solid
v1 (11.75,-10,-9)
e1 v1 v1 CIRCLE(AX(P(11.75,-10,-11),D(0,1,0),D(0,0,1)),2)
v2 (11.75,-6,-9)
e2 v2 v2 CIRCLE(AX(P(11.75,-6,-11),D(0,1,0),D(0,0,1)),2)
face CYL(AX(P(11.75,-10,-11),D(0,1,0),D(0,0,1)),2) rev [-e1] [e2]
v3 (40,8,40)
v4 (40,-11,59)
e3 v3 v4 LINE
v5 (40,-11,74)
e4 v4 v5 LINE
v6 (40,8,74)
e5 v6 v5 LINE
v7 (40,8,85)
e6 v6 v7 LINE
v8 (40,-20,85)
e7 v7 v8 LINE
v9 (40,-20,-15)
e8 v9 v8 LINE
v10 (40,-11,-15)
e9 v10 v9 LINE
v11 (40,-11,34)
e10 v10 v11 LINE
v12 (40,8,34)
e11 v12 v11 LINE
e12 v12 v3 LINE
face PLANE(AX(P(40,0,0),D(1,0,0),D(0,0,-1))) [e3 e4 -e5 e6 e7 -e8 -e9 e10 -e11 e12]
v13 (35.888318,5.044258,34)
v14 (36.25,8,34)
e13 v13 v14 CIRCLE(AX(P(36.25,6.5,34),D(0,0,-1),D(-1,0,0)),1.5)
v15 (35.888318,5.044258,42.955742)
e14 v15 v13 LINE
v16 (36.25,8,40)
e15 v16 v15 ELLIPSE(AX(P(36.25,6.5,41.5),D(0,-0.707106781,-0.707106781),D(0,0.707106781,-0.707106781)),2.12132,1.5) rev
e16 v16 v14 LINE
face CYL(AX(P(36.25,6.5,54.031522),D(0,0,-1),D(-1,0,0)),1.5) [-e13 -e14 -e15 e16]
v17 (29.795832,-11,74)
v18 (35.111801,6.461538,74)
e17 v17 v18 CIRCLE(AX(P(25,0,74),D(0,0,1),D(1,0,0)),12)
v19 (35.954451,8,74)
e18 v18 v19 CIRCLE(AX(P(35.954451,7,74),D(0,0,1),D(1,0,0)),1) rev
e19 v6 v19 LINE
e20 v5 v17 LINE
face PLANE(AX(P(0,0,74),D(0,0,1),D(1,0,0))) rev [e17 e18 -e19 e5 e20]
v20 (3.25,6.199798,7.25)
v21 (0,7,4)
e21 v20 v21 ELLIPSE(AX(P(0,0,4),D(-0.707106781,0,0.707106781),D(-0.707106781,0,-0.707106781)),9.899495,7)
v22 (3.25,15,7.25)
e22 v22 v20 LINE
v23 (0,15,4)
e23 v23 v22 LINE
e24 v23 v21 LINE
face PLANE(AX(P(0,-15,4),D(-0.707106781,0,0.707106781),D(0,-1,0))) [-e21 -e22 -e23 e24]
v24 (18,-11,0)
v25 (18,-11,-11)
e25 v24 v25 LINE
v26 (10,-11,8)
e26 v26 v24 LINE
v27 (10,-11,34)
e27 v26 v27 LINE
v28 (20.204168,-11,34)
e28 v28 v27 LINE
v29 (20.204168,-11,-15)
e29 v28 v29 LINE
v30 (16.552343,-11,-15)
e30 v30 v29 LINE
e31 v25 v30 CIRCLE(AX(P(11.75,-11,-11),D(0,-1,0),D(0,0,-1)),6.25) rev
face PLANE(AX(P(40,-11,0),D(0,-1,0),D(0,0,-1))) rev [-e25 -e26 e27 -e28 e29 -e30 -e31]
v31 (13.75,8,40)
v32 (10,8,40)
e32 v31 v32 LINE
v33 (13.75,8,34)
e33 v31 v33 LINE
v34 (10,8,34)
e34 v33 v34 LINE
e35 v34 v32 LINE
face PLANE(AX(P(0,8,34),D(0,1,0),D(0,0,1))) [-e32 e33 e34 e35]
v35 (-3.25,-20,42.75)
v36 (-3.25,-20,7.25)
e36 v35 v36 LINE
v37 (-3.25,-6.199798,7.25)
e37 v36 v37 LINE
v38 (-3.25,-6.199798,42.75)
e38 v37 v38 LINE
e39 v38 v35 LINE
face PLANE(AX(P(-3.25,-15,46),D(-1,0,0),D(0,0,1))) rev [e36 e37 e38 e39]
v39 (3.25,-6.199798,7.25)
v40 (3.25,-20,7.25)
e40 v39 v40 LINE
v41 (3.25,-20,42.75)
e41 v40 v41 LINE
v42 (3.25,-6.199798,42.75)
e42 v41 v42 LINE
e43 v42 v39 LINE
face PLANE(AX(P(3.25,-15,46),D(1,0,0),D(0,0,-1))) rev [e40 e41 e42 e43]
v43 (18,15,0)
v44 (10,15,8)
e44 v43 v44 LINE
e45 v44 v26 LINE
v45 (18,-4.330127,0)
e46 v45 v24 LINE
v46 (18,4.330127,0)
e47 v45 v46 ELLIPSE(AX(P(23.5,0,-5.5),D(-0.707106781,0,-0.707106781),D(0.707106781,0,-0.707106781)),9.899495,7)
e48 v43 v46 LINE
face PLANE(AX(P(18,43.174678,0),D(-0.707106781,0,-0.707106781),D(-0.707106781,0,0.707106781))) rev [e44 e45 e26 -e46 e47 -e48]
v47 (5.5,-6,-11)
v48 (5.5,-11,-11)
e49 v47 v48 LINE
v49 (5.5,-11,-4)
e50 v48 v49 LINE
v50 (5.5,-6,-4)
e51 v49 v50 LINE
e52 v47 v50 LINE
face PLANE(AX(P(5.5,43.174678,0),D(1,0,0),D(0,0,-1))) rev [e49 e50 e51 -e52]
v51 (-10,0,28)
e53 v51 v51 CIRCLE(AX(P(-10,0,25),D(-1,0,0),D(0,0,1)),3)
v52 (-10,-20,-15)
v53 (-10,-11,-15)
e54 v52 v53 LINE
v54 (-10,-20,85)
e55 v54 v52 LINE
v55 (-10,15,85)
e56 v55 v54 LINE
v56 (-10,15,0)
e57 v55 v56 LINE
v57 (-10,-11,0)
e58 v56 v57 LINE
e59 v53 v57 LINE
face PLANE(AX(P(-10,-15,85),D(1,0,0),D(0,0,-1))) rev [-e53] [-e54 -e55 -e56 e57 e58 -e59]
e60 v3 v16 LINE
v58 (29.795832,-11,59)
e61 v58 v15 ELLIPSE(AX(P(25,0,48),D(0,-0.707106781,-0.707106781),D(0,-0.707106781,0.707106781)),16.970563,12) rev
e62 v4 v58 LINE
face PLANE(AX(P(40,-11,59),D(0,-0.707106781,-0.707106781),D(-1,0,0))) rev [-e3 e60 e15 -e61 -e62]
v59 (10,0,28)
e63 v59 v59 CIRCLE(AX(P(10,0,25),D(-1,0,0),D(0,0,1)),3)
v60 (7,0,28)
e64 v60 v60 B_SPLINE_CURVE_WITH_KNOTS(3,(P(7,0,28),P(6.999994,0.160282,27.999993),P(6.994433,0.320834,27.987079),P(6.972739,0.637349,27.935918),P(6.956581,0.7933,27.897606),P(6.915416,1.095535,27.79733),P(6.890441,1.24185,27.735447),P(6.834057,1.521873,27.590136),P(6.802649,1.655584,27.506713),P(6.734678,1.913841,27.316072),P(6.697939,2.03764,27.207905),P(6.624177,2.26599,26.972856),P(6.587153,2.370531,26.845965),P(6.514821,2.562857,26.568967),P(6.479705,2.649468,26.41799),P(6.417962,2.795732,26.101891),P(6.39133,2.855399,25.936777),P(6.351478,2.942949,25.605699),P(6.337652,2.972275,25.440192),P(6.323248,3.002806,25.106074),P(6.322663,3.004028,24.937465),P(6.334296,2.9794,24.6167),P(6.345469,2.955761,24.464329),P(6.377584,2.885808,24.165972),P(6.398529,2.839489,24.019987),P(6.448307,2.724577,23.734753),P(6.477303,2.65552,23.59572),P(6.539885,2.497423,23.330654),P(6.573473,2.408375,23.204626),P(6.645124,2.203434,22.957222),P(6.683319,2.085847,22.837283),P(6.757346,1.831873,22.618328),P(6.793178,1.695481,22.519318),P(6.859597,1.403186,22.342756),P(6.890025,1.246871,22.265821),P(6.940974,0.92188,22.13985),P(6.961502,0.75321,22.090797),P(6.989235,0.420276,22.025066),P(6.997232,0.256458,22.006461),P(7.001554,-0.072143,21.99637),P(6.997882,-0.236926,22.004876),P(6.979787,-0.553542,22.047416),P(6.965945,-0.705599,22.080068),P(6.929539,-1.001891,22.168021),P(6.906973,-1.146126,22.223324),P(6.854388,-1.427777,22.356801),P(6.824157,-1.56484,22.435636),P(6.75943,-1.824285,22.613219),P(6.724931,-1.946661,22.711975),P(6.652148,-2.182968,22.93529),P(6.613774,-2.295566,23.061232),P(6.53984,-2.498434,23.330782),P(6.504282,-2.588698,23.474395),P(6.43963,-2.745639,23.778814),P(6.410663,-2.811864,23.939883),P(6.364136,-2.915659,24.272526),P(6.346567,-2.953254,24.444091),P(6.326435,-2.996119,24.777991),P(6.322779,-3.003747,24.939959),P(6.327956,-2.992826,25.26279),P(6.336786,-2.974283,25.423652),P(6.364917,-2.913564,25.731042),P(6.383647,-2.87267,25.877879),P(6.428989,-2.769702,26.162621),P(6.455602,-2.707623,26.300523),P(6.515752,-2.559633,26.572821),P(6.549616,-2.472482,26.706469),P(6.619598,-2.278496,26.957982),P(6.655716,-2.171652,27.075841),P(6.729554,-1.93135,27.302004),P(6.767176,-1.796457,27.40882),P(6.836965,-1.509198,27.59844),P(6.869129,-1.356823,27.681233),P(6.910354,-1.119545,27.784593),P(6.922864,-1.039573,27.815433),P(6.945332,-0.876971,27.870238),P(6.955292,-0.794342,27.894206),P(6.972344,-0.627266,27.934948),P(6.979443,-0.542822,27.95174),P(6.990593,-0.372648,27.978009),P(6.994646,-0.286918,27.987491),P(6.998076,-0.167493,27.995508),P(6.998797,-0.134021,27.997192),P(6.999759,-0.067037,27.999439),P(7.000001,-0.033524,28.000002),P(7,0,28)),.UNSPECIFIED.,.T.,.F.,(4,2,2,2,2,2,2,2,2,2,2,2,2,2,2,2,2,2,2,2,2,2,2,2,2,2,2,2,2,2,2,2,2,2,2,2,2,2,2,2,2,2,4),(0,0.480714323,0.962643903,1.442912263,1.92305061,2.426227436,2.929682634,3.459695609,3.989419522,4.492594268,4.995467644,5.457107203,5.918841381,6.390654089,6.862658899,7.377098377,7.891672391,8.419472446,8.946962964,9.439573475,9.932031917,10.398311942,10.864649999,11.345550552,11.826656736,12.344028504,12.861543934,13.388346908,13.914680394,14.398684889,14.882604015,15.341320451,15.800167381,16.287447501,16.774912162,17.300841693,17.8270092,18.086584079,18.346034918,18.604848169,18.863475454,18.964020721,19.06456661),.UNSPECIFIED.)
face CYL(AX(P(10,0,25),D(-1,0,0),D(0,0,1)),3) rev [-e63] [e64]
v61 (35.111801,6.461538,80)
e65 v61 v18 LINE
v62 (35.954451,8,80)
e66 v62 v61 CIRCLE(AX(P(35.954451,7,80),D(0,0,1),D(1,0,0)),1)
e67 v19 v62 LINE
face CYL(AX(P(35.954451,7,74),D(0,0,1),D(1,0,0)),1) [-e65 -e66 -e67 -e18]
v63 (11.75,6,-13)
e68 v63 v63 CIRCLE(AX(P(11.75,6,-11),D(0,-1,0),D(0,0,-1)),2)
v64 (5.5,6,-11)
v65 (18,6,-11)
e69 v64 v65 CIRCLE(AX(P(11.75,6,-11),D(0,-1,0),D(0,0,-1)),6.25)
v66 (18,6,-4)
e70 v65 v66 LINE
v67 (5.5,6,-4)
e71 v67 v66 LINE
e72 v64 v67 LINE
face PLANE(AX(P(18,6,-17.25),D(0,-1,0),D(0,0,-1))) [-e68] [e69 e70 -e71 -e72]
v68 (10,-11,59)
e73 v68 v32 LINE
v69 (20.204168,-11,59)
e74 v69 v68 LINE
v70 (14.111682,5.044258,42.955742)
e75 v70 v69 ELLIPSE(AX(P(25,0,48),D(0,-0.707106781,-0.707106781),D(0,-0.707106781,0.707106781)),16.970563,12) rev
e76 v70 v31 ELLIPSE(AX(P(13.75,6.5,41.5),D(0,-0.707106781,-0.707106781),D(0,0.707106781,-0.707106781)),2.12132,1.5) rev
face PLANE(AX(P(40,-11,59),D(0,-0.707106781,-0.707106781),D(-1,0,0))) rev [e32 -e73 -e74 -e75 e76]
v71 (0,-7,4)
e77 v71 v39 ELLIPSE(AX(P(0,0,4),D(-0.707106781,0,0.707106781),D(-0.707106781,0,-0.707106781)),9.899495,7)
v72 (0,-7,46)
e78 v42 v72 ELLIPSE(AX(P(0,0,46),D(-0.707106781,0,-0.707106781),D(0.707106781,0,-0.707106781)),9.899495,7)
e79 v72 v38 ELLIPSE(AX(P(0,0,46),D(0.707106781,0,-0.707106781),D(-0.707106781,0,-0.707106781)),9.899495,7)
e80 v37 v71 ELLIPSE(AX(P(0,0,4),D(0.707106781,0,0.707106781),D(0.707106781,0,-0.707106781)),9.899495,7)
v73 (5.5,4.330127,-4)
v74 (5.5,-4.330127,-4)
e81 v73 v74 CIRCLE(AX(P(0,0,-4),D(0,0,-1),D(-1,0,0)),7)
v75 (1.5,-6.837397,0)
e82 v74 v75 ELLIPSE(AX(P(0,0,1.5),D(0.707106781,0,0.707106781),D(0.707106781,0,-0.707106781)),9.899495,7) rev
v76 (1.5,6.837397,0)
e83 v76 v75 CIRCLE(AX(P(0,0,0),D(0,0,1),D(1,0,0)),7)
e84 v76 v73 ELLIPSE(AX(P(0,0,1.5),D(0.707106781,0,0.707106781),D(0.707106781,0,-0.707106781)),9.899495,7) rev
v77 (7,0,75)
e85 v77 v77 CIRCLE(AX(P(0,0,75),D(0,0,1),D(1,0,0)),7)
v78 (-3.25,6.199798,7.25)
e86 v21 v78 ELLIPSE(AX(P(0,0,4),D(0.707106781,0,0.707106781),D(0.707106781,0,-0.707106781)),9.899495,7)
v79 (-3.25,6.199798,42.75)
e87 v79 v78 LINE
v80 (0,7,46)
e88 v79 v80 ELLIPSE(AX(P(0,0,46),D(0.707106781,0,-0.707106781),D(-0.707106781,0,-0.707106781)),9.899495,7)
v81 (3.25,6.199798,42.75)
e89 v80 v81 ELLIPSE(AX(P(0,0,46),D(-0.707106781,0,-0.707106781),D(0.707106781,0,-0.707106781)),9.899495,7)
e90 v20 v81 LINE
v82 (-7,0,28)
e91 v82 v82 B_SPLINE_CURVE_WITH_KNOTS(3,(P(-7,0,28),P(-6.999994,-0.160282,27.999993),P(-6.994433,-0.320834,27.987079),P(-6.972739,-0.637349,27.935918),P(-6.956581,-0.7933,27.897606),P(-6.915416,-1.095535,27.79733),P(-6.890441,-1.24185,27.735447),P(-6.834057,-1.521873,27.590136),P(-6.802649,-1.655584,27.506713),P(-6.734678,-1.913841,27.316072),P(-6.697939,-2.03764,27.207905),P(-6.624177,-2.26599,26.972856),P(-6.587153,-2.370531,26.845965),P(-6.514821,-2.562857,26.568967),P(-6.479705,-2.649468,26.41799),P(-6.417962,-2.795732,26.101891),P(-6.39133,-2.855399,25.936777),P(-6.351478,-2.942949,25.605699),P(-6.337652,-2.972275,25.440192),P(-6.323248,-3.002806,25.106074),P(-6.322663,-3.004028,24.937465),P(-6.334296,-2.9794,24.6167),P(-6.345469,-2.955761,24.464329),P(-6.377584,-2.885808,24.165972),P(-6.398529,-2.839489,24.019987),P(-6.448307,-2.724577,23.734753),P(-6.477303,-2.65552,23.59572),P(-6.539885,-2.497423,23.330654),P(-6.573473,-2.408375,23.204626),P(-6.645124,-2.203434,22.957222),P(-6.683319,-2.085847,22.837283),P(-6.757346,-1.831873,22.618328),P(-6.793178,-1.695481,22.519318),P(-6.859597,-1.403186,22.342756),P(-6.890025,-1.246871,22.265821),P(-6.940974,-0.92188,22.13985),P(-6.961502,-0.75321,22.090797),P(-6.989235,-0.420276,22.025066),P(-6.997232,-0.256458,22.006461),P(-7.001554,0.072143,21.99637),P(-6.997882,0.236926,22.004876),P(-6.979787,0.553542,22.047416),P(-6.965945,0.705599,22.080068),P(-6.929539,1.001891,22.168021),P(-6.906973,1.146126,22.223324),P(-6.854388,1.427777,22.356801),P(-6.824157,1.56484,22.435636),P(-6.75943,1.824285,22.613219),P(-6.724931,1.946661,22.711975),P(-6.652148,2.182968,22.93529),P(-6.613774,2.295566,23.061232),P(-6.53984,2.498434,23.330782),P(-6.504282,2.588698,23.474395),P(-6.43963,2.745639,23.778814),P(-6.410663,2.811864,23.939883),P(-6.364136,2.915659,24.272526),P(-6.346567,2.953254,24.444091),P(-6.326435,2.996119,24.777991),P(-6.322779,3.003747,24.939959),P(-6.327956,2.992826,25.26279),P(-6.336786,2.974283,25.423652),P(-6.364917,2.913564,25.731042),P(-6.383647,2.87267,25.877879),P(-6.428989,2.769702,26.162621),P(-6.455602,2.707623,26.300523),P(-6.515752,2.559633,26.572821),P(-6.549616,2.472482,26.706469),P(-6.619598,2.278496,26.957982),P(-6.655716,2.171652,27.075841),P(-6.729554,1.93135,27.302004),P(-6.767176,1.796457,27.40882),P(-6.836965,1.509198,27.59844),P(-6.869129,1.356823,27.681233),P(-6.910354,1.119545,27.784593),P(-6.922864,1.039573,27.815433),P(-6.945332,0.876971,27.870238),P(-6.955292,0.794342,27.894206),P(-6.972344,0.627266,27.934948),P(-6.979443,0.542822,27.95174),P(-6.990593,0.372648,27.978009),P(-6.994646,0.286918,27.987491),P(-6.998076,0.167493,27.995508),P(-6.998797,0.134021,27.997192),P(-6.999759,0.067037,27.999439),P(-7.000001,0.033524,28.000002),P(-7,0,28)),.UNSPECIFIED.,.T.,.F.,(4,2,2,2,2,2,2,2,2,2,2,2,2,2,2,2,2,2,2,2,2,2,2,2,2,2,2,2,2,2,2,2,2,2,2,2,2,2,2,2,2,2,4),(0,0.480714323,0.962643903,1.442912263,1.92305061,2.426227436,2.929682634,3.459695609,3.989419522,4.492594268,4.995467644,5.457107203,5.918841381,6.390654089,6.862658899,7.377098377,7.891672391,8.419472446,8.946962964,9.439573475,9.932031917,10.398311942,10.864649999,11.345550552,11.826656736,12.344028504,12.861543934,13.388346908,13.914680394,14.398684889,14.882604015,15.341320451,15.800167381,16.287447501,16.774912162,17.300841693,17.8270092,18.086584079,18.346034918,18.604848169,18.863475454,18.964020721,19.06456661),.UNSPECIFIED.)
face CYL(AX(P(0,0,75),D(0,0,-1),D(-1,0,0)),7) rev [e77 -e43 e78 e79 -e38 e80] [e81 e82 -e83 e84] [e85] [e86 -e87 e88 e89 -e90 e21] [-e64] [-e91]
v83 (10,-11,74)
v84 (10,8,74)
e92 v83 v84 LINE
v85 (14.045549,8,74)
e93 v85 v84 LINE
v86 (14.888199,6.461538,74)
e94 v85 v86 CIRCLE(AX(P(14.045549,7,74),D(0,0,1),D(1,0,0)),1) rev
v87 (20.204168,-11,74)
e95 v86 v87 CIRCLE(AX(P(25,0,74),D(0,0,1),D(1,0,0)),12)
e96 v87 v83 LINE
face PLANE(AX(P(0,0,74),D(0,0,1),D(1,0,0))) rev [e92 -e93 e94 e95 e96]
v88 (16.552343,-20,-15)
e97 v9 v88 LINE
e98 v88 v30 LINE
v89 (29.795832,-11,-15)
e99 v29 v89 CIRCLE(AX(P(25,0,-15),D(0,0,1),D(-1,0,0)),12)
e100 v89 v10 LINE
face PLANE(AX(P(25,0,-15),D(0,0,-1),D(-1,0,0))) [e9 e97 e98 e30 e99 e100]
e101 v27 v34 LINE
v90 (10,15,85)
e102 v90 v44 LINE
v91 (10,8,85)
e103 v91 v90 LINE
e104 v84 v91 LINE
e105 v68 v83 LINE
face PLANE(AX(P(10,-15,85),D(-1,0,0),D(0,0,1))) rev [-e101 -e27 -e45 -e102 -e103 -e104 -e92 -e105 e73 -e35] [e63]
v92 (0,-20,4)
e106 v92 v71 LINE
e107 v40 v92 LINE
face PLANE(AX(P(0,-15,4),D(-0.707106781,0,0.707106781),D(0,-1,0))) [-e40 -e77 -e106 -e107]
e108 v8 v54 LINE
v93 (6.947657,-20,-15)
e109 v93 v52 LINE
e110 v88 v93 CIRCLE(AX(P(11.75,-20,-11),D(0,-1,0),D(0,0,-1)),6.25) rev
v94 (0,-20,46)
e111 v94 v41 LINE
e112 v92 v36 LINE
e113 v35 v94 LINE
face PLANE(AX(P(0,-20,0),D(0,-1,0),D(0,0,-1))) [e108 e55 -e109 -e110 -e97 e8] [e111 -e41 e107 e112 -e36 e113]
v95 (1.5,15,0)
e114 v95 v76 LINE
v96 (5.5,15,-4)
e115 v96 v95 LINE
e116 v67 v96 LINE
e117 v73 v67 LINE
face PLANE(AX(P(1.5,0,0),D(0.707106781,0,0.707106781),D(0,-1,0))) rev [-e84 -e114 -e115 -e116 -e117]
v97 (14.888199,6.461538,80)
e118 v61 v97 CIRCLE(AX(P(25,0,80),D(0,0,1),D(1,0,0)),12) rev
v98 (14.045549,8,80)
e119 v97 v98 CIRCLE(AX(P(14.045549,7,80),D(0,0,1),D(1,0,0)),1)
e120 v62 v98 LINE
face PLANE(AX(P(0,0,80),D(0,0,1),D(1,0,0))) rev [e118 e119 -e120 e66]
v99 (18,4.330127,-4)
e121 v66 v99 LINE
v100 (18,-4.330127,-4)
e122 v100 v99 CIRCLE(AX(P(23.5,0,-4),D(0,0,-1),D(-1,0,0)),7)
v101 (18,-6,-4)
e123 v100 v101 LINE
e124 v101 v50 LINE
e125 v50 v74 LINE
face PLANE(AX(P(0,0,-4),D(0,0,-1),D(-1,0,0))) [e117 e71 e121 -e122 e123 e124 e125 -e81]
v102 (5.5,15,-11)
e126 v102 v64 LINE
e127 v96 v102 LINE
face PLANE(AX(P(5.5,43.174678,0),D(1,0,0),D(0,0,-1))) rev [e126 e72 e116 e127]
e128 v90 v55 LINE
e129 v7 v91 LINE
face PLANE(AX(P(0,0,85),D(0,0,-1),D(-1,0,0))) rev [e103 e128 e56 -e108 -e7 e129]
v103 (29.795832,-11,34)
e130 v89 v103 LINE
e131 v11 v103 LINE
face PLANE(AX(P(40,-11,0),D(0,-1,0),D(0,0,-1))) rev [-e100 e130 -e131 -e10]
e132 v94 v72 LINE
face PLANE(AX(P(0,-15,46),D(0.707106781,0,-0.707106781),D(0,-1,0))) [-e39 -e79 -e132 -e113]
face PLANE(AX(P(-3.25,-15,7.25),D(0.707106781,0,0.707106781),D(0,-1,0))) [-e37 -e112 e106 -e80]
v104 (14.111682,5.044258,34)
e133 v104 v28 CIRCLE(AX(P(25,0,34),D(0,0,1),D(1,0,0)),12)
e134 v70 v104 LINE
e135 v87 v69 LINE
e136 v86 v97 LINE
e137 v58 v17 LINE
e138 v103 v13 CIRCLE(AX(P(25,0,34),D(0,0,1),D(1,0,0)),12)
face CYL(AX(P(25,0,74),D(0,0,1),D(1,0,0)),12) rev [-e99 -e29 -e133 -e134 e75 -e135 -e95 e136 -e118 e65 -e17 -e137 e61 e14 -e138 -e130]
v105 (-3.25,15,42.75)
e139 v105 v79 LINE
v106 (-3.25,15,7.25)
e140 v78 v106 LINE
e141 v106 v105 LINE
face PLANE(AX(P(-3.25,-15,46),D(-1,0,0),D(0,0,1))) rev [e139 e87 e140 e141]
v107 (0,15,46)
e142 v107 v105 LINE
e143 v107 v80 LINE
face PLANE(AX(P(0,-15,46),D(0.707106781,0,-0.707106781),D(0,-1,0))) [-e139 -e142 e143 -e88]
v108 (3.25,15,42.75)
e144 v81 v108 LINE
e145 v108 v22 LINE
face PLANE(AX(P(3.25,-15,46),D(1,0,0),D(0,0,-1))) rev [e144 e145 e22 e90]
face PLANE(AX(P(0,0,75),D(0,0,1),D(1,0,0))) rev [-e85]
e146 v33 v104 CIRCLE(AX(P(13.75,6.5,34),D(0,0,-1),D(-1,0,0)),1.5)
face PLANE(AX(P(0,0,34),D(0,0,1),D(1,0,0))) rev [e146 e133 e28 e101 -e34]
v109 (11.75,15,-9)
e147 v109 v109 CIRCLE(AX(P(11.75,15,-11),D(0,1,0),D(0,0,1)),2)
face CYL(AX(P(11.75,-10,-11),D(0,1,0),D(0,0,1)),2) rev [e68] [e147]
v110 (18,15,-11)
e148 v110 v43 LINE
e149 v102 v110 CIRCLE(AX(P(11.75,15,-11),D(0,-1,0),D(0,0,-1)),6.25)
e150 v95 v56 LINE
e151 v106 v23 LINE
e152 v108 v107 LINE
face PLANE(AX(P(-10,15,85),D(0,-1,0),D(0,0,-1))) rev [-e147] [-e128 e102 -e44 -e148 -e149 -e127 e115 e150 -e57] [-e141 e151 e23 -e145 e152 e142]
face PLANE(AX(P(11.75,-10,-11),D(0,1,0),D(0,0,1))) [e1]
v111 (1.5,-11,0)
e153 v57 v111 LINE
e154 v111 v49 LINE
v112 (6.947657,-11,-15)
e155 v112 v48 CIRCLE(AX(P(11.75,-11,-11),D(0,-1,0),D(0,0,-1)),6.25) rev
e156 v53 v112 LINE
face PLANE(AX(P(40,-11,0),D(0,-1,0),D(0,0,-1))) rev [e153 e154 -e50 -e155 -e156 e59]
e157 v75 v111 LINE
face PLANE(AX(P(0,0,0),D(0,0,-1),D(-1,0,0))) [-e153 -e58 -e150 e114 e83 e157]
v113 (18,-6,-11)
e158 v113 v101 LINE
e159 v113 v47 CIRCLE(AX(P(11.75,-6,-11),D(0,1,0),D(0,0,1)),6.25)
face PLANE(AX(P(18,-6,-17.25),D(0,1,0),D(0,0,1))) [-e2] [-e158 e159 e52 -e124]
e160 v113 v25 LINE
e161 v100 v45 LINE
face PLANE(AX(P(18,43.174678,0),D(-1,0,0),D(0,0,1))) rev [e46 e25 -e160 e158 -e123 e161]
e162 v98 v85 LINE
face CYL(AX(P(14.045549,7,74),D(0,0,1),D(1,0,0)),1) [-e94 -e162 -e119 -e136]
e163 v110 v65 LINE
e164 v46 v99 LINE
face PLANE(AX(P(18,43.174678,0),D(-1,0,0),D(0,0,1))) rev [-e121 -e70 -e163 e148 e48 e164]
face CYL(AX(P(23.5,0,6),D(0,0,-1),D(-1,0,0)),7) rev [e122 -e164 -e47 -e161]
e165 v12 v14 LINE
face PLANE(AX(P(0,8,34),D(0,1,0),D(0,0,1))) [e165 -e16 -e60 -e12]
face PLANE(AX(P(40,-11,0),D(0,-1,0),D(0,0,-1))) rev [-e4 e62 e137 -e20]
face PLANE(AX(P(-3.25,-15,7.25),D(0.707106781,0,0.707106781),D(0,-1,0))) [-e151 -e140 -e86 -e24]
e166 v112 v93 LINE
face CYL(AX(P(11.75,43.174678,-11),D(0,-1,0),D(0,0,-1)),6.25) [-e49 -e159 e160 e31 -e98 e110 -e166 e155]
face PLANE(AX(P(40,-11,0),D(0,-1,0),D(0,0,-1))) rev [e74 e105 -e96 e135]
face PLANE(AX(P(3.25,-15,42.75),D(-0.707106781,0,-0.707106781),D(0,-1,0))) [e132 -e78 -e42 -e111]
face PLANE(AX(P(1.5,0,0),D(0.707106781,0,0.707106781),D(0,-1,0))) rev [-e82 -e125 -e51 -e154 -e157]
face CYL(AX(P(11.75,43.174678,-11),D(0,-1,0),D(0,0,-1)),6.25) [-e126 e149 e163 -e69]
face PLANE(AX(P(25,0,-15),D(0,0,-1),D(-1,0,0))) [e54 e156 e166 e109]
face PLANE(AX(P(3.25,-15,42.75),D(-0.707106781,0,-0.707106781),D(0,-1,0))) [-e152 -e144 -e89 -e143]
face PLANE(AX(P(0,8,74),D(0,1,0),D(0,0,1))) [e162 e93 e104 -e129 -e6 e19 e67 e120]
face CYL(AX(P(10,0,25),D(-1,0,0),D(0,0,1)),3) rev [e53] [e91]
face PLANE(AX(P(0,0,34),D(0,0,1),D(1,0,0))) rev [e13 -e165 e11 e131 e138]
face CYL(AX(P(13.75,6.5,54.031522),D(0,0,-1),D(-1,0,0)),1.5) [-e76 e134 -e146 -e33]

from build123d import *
from build123d.topology import SkipClean

# Parameters (mm, degrees)
SKETCH1_W               = 20
SKETCH1_H               = 30
BOSS_EXTRUDE1_DEPTH     = 85
SKETCH3_R               = 7
CUT_EXTRUDE1_DEPTH      = 75
SKETCH4_R               = 3
CUT_EXTRUDE2_DEPTH      = 89.600225733
SKETCH5_W               = 6.5
SKETCH5_H               = 42
CUT_EXTRUDE3_DEPTH      = 91.691785747
SKETCH6_W               = 85
SKETCH6_H               = 4
BOSS_EXTRUDE2_DEPTH     = 30
BOSS_EXTRUDE3_DEPTH     = 11
SKETCH8_R               = 12
CUT_EXTRUDE4_DEPTH      = 96.131488042
SKETCH9_W               = 30
SKETCH9_H               = 23
BOSS_EXTRUDE4_DEPTH     = 5
BOSS_EXTRUDE5_START     = -45
BOSS_EXTRUDE5_DEPTH     = 6
SKETCH10_W              = 50
SKETCH10_H              = 85
SKETCH10_W_2            = 6.5
SKETCH10_H_2            = 42
BOSS_EXTRUDE6_DEPTH     = 5
BOSS_EXTRUDE7_DEPTH     = 15
BOSS_EXTRUDE8_START     = -9
BOSS_EXTRUDE8_DEPTH     = 35
CUT_EXTRUDE5_DEPTH      = 110.544511501
CUT_EXTRUDE5_DEPTH_BACK = 11
SKETCH13_W              = 12.5
SKETCH13_H              = 12
SKETCH14_R              = 2
CUT_EXTRUDE6_DEPTH      = 25
CUT_EXTRUDE7_DEPTH      = 97.046863561
SKETCH17_R              = 7
CUT_EXTRUDE8_DEPTH      = 10
CHAMFER2_SIZE           = 4
CHAMFER3_START          = 10
CHAMFER3_DEPTH          = 10.204168477
CHAMFER3_START_2        = 29.795831523
CHAMFER3_2_DEPTH        = 10.204168477
CHAMFER3_START_3        = 40
CHAMFER3_3_DEPTH        = 19
BOSS_EXTRUDE9_DEPTH     = 6
FILLET1_R               = 1
BOSS_EXTRUDE10_REACH    = 70.019
CHAMFER5_SIZE           = 3.25


with BuildPart() as part:
    # Sketch1 → Boss-Extrude1 (new body)
    with BuildSketch(Plane.XY):
        Rectangle(SKETCH1_W, SKETCH1_H)
    extrude(amount=BOSS_EXTRUDE1_DEPTH)

    # Sketch3 → Cut-Extrude1 (cut)
    with BuildSketch(Plane.XY):
        Circle(SKETCH3_R)
    extrude(amount=CUT_EXTRUDE1_DEPTH, mode=Mode.SUBTRACT)

    # Sketch4 → Cut-Extrude2 (cut, through all)
    with BuildSketch(Plane.ZY.offset(10)):
        with Locations((25, 0)):
            Circle(SKETCH4_R)
    extrude(amount=-CUT_EXTRUDE2_DEPTH, mode=Mode.SUBTRACT)

    # Sketch5 → Cut-Extrude3 (cut, through all)
    with BuildSketch(Plane(origin=(0, 15, 0), x_dir=(1, 0, 0), z_dir=(0, 1, 0))):
        with Locations((0, -25)):
            Rectangle(SKETCH5_W, SKETCH5_H)
    extrude(amount=-CUT_EXTRUDE3_DEPTH, mode=Mode.SUBTRACT)

    # Sketch6 → Boss-Extrude2 (add)
    with BuildSketch(Plane(origin=(10, 0, 0), x_dir=(0, 0, -1), z_dir=(1, 0, 0))):
        with Locations((-42.5, -13)):
            Rectangle(SKETCH6_W, SKETCH6_H)
    extrude(amount=BOSS_EXTRUDE2_DEPTH)

    # Sketch7 → Boss-Extrude3 (add)
    with BuildSketch(Plane.XY.offset(85)):
        with BuildLine():
            Line((10, -11), (20.204168477, -11))
            ThreePointArc((20.204168477, -11), (14.96132533, -6.574573055), (13, 0))
            Line((13, 0), (13, 8))
            Line((13, 8), (10, 8))
            Line((10, 8), (10, -11))
        make_face()
        with BuildLine():
            Line((40, -11), (40, 8))
            Line((40, 8), (37, 8))
            Line((37, 8), (37, 0))
            ThreePointArc((37, 0), (35.03867467, -6.574573055), (29.795831523, -11))
            Line((29.795831523, -11), (40, -11))
        make_face()
    extrude(amount=-BOSS_EXTRUDE3_DEPTH)

    # Sketch8 → Cut-Extrude4 (cut, through all)
    with SkipClean():  # the faces are left unmerged after this step: merging them gives an invalid solid
        with BuildSketch(Plane.XY.offset(85)):
            with Locations((25, 0)):
                Circle(SKETCH8_R)
        extrude(amount=-CUT_EXTRUDE4_DEPTH, mode=Mode.SUBTRACT)

    # Sketch9 → Boss-Extrude4 (add)
    with SkipClean():  # the faces are left unmerged after this step: merging them gives an invalid solid
        with BuildSketch(Plane.XY.offset(85)):
            with Locations((25, -3.5)):
                Rectangle(SKETCH9_W, SKETCH9_H)
        extrude(amount=-BOSS_EXTRUDE4_DEPTH)

    # Sketch7<3> → Boss-Extrude5 (add)
    with SkipClean():  # the faces are left unmerged after this step: merging them gives an invalid solid
        with BuildSketch(Plane.XY.offset(85).offset(BOSS_EXTRUDE5_START)):
            with BuildLine():
                Line((40, -11), (40, 0))
                Line((40, 0), (40, 8))
                Line((40, 8), (37, 8))
                Line((37, 8), (37, 0))
                ThreePointArc((37, 0), (35.03867467, -6.574573055), (29.795831523, -11))
                Line((29.795831523, -11), (40, -11))
            make_face()
            with BuildLine():
                Line((10, -11), (20.204168477, -11))
                ThreePointArc((20.204168477, -11), (14.96132533, -6.574573055), (13, 0))
                Line((13, 0), (13, 8))
                Line((13, 8), (10, 8))
                Line((10, 8), (10, -11))
            make_face()
        extrude(amount=-BOSS_EXTRUDE5_DEPTH)

    # Sketch10 → Boss-Extrude6 (add)
    with SkipClean():  # the faces are left unmerged after this step: merging them gives an invalid solid
        with BuildSketch(Plane.XZ.offset(15)):
            with Locations((15, 42.5)):
                Rectangle(SKETCH10_W, SKETCH10_H)
            with Locations((0, 25)):
                Rectangle(SKETCH10_W_2, SKETCH10_H_2, mode=Mode.SUBTRACT)
        extrude(amount=BOSS_EXTRUDE6_DEPTH)

    # Sketch11 → Boss-Extrude7 (add)
    with BuildSketch(Plane(origin=(0, 0, 0), x_dir=(-1, 0, 0), z_dir=(0, 0, -1))):
        with BuildLine():
            Line((-10, -11), (10, -11))
            Line((10, -11), (10, -20))
            Line((10, -20), (-40, -20))
            Line((-40, -20), (-40, -11))
            Line((-40, -11), (-29.795831523, -11))
            ThreePointArc((-29.795831523, -11), (-25, -12), (-20.204168477, -11))
            Line((-20.204168477, -11), (-10, -11))
        make_face()
    extrude(amount=BOSS_EXTRUDE7_DEPTH)

    # Sketch12 → Boss-Extrude8 (add)
    with SkipClean():  # the faces are left unmerged after this step: merging them gives an invalid solid
        with BuildSketch(Plane(origin=(0, -11, 0), x_dir=(1, 0, 0), z_dir=(0, 1, 0)).offset(BOSS_EXTRUDE8_START)):
            with BuildLine():
                Line((5.5, 0), (10, 0))
                Line((10, 0), (10, -8))
                Line((10, -8), (18, 0))
                Line((18, 0), (18, 11))
                ThreePointArc((18, 11), (11.75, 17.25), (5.5, 11))
                Line((5.5, 11), (5.5, 0))
            make_face()
        extrude(amount=BOSS_EXTRUDE8_DEPTH)

    # Sketch13 → Cut-Extrude5 (cut, two sides: drawn at the far end of the back side and taken through both)
    with BuildSketch(Plane(origin=(0, 0, -15), x_dir=(-1, 0, 0), z_dir=(0, 0, -1)).offset(-CUT_EXTRUDE5_DEPTH_BACK)):
        with Locations((-11.75, 0)):
            Rectangle(SKETCH13_W, SKETCH13_H)
    extrude(amount=CUT_EXTRUDE5_DEPTH + CUT_EXTRUDE5_DEPTH_BACK, mode=Mode.SUBTRACT)

    # Sketch14 → Cut-Extrude6 (cut)
    with BuildSketch(Plane(origin=(0, 15, 0), x_dir=(1, 0, 0), z_dir=(0, 1, 0))):
        with Locations(Location((11.75, 11, 0), (0, 0, 270))):
            Circle(SKETCH14_R)
    extrude(amount=-CUT_EXTRUDE6_DEPTH, mode=Mode.SUBTRACT)

    # Sketch16 → Cut-Extrude7 (cut, through all)
    with SkipClean():  # the faces are left unmerged after this step: merging them gives an invalid solid
        with BuildSketch(Plane.XY):
            with BuildLine():
                Line((5.5, 4.330127019), (5.5, -4.330127019))
                ThreePointArc((5.5, -4.330127019), (7, 0), (5.5, 4.330127019))
            make_face()
        extrude(amount=-CUT_EXTRUDE7_DEPTH, mode=Mode.SUBTRACT)

    # Sketch17 → Cut-Extrude8 (cut)
    with SkipClean():  # the faces are left unmerged after this step: merging them gives an invalid solid
        with BuildSketch(Plane(origin=(0, 0, -4), x_dir=(-1, 0, 0), z_dir=(0, 0, -1))):
            with Locations((-23.5, 0)):
                Circle(SKETCH17_R)
        extrude(amount=-CUT_EXTRUDE8_DEPTH, mode=Mode.SUBTRACT)

    # Chamfer2
    # the kernel refuses this chamfer: 4 mm, written as the material it adds along each edge
    with BuildSketch(Plane(origin=(5.5, -21.286731952, 0), x_dir=(-1, 0, 0), z_dir=(0, 1, 0))) as chamfer2_piece_1_section:
        Polygon((CHAMFER2_SIZE, 0), (0, -CHAMFER2_SIZE), (0, 0), align=None)
    chamfer2_piece_1 = extrude(amount=27.243336885, mode=Mode.PRIVATE)
    chamfer2_piece_1 = chamfer2_piece_1 - Plane(origin=(0, 0, 0), x_dir=(1, 0, 0), z_dir=(0, 0, -1)) * Cylinder(7, 71, mode=Mode.PRIVATE)
    chamfer2_piece_1 = split(chamfer2_piece_1, bisect_by=Plane(origin=(5.5, -20, 0), z_dir=(0, 1, 0)), keep=Keep.TOP, mode=Mode.PRIVATE)
    add(chamfer2_piece_1)
    with BuildSketch(Plane(origin=(5.5, -5.956604933, 0), x_dir=(-1, 0, 0), z_dir=(0, 1, 0))) as chamfer2_piece_2_section:
        Polygon((CHAMFER2_SIZE, 0), (0, -CHAMFER2_SIZE), (0, 0), align=None)
    chamfer2_piece_2 = extrude(amount=20.956604933, mode=Mode.PRIVATE)
    chamfer2_piece_2 = chamfer2_piece_2 - Plane(origin=(0, 0, 0), x_dir=(1, 0, 0), z_dir=(0, 0, -1)) * Cylinder(7, 58, mode=Mode.PRIVATE)
    add(chamfer2_piece_2)

    # Chamfer3: read off the stored shape, not the designer's step
    # Chamfer3 outline → Chamfer3 (add)
    with SkipClean():  # the faces are left unmerged after this step: merging them gives an invalid solid
        with BuildSketch(Plane.YZ.offset(CHAMFER3_START)):
            Polygon((8, 40), (-11, 59), (-11, 40), align=None)
        extrude(amount=CHAMFER3_DEPTH)
    add(part.part.scale(1), mode=Mode.REPLACE)  # the faces are merged on a copy

    # Chamfer3 2 outline → Chamfer3 2 (add)
    with BuildSketch(Plane.YZ.offset(CHAMFER3_START_2)):
        Polygon((8, 40), (-11, 59), (-11, 40), align=None)
    extrude(amount=CHAMFER3_2_DEPTH)

    # Chamfer3 3 outline → Chamfer3 3 (cut)
    with BuildSketch(Plane.XY.offset(CHAMFER3_START_3)):
        with BuildLine():
            ThreePointArc((29.795831523, -11), (35.03867467, -6.574573055), (37, 0))
            Line((37, 0), (37, 9))
            Line((37, 9), (29.795831523, 9))
            Line((29.795831523, 9), (29.795831523, -11))
        make_face()
        with BuildLine():
            ThreePointArc((13, 0), (14.96132533, -6.574573055), (20.204168477, -11))
            Line((20.204168477, -11), (20.204168477, 9))
            Line((20.204168477, 9), (13, 9))
            Line((13, 9), (13, 0))
        make_face()
    extrude(amount=CHAMFER3_3_DEPTH, mode=Mode.SUBTRACT)

    # Sketch19 → Boss-Extrude9 (add)
    with BuildSketch(Plane(origin=(0, 0, 80), x_dir=(-1, 0, 0), z_dir=(0, 0, -1))):
        with BuildLine():
            Line((-37, 0), (-37, 8))
            Line((-37, 8), (-33.94427191, 8))
            ThreePointArc((-33.94427191, 8), (-36.210068308, 4.281865077), (-37, 0))
        make_face()
        with BuildLine():
            Line((-13, 8), (-13, 0))
            ThreePointArc((-13, 0), (-13.789931692, 4.281865077), (-16.05572809, 8))
            Line((-16.05572809, 8), (-13, 8))
        make_face()
    extrude(amount=BOSS_EXTRUDE9_DEPTH)

    # Fillet1
    # the kernel refuses this fillet: 1 mm, written as the material it takes off along each edge
    with BuildSketch(Plane(origin=(33.94427191, 8, 80), x_dir=(1, 0, 0), z_dir=(0, 0, -1))) as fillet1_piece_1:
        with BuildLine():
            CenterArc((2.01017924, 1), FILLET1_R, 147.421029607, 122.578970393)
            ThreePointArc((1.167529152, 1.538461538), (0.61476545, 0.745704393), (0, 0))
            Line((0, 0), (2.01017924, 0))
        make_face()
    extrude(amount=11.0254481, mode=Mode.SUBTRACT)
    with BuildSketch(Plane(origin=(16.05572809, 8, 80), x_dir=(-1, 0, 0), z_dir=(0, 0, -1))) as fillet1_piece_2:
        with BuildLine():
            CenterArc((2.01017924, -1), FILLET1_R, 90, 122.578970393)
            ThreePointArc((1.167529152, -1.538461538), (0.61476545, -0.745704393), (0, 0))
            Line((0, 0), (2.01017924, 0))
        make_face()
    extrude(amount=11.0254481, mode=Mode.SUBTRACT)

    # Boss-Extrude10: up to this plane
    boss_extrude10_end = Plane(origin=(40, -11, 59), z_dir=(0, -0.7071067811865512, -0.7071067811865438))
    # Sketch20 → Boss-Extrude10 (add, up to the surface)
    with BuildSketch(Plane(origin=(0, 0, 34), x_dir=(-1, 0, 0), z_dir=(0, 0, -1)), mode=Mode.PRIVATE) as boss_extrude10_sk1:
        with BuildLine():
            Line((-36.25, 8), (-37, 8))
            Line((-37, 8), (-37, 0))
            ThreePointArc((-37, 0), (-36.718784369, 2.582652302), (-35.888317848, 5.044257571))
            ThreePointArc((-35.888317848, 5.044257571), (-34.761105503, 6.68218995), (-36.25, 8))
        make_face()
    boss_extrude10_tool1 = split(extrude(boss_extrude10_sk1.sketch, amount=-BOSS_EXTRUDE10_REACH, mode=Mode.PRIVATE), bisect_by=boss_extrude10_end, keep=Keep.BOTH, mode=Mode.PRIVATE)
    add(boss_extrude10_tool1.solids().sort_by_distance((36.164364, 5.853869, 34))[0])
    # Sketch20 → Boss-Extrude10 (add, up to the surface)
    with BuildSketch(Plane(origin=(0, 0, 34), x_dir=(-1, 0, 0), z_dir=(0, 0, -1)), mode=Mode.PRIVATE) as boss_extrude10_sk2:
        with BuildLine():
            Line((-13.75, 8), (-13, 8))
            Line((-13, 8), (-13, 0))
            ThreePointArc((-13, 0), (-13.281215631, 2.582652302), (-14.111682152, 5.044257571))
            ThreePointArc((-14.111682152, 5.044257571), (-15.238894497, 6.68218995), (-13.75, 8))
        make_face()
    boss_extrude10_tool2 = split(extrude(boss_extrude10_sk2.sketch, amount=-BOSS_EXTRUDE10_REACH, mode=Mode.PRIVATE), bisect_by=boss_extrude10_end, keep=Keep.BOTH, mode=Mode.PRIVATE)
    add(boss_extrude10_tool2.solids().sort_by_distance((13.835636, 5.853869, 34))[0])

    # Chamfer5
    # the kernel refuses this chamfer: 3.25 mm, written as the material it adds along each edge
    with BuildSketch(Plane(origin=(3.25, 2.158171327, 4), x_dir=(0, 0, 1), z_dir=(0, -1, 0))) as chamfer5_piece_1_section:
        Polygon((CHAMFER5_SIZE, 0), (0, CHAMFER5_SIZE), (0, 0), align=None)
    chamfer5_piece_1 = extrude(amount=22.158171327, mode=Mode.PRIVATE)
    chamfer5_piece_1 = chamfer5_piece_1 - Plane(origin=(0, 0, 4), x_dir=(1, 0, 0), z_dir=(0, 0, -1)) * Cylinder(7, 58, mode=Mode.PRIVATE)
    add(chamfer5_piece_1)
    with BuildSketch(Plane(origin=(3.25, 15, 46), x_dir=(-1, 0, 0), z_dir=(0, -1, 0))) as chamfer5_piece_2_section:
        Polygon((CHAMFER5_SIZE, 0), (0, CHAMFER5_SIZE), (0, 0), align=None)
    chamfer5_piece_2 = extrude(amount=17.158171327, mode=Mode.PRIVATE)
    chamfer5_piece_2 = chamfer5_piece_2 - Plane(origin=(0, 0, 46), x_dir=(1, 0, 0), z_dir=(0, 0, -1)) * Cylinder(7, 48, mode=Mode.PRIVATE)
    add(chamfer5_piece_2)
    with BuildSketch(Plane(origin=(-3.25, 15, 46), x_dir=(0, 0, -1), z_dir=(0, -1, 0))) as chamfer5_piece_3_section:
        Polygon((CHAMFER5_SIZE, 0), (0, CHAMFER5_SIZE), (0, 0), align=None)
    chamfer5_piece_3 = extrude(amount=17.158171327, mode=Mode.PRIVATE)
    chamfer5_piece_3 = chamfer5_piece_3 - Plane(origin=(0, 0, 46), x_dir=(1, 0, 0), z_dir=(0, 0, -1)) * Cylinder(7, 48, mode=Mode.PRIVATE)
    add(chamfer5_piece_3)
    with BuildSketch(Plane(origin=(-3.25, 15, 4), x_dir=(0, 0, 1), z_dir=(0, -1, 0))) as chamfer5_piece_4_section:
        Polygon((CHAMFER5_SIZE, 0), (0, -CHAMFER5_SIZE), (0, 0), align=None)
    chamfer5_piece_4 = extrude(amount=17.158171327, mode=Mode.PRIVATE)
    chamfer5_piece_4 = chamfer5_piece_4 - Plane(origin=(0, 0, 4), x_dir=(1, 0, 0), z_dir=(0, 0, -1)) * Cylinder(7, 48, mode=Mode.PRIVATE)
    add(chamfer5_piece_4)
    with BuildSketch(Plane(origin=(3.25, 15, 4), x_dir=(-1, 0, 0), z_dir=(0, -1, 0))) as chamfer5_piece_5_section:
        Polygon((CHAMFER5_SIZE, 0), (0, -CHAMFER5_SIZE), (0, 0), align=None)
    chamfer5_piece_5 = extrude(amount=17.158171327, mode=Mode.PRIVATE)
    chamfer5_piece_5 = chamfer5_piece_5 - Plane(origin=(0, 0, 4), x_dir=(1, 0, 0), z_dir=(0, 0, -1)) * Cylinder(7, 48, mode=Mode.PRIVATE)
    add(chamfer5_piece_5)
    with BuildSketch(Plane(origin=(3.25, -20, 46), x_dir=(0, 0, -1), z_dir=(0, 1, 0))) as chamfer5_piece_6_section:
        Polygon((CHAMFER5_SIZE, 0), (0, CHAMFER5_SIZE), (0, 0), align=None)
    chamfer5_piece_6 = extrude(amount=22.158171327, mode=Mode.PRIVATE)
    chamfer5_piece_6 = chamfer5_piece_6 - Plane(origin=(0, 0, 46), x_dir=(1, 0, 0), z_dir=(0, 0, -1)) * Cylinder(7, 58, mode=Mode.PRIVATE)
    add(chamfer5_piece_6)
    with BuildSketch(Plane(origin=(-3.25, -20, 46), x_dir=(1, 0, 0), z_dir=(0, 1, 0))) as chamfer5_piece_7_section:
        Polygon((CHAMFER5_SIZE, 0), (0, CHAMFER5_SIZE), (0, 0), align=None)
    chamfer5_piece_7 = extrude(amount=22.158171327, mode=Mode.PRIVATE)
    chamfer5_piece_7 = chamfer5_piece_7 - Plane(origin=(0, 0, 46), x_dir=(1, 0, 0), z_dir=(0, 0, -1)) * Cylinder(7, 58, mode=Mode.PRIVATE)
    add(chamfer5_piece_7)
    with BuildSketch(Plane(origin=(-3.25, 2.158171327, 4), x_dir=(1, 0, 0), z_dir=(0, -1, 0))) as chamfer5_piece_8_section:
        Polygon((CHAMFER5_SIZE, 0), (0, CHAMFER5_SIZE), (0, 0), align=None)
    chamfer5_piece_8 = extrude(amount=22.158171327, mode=Mode.PRIVATE)
    chamfer5_piece_8 = chamfer5_piece_8 - Plane(origin=(0, 0, 4), x_dir=(1, 0, 0), z_dir=(0, 0, -1)) * Cylinder(7, 58, mode=Mode.PRIVATE)
    add(chamfer5_piece_8)


solid = part.part
